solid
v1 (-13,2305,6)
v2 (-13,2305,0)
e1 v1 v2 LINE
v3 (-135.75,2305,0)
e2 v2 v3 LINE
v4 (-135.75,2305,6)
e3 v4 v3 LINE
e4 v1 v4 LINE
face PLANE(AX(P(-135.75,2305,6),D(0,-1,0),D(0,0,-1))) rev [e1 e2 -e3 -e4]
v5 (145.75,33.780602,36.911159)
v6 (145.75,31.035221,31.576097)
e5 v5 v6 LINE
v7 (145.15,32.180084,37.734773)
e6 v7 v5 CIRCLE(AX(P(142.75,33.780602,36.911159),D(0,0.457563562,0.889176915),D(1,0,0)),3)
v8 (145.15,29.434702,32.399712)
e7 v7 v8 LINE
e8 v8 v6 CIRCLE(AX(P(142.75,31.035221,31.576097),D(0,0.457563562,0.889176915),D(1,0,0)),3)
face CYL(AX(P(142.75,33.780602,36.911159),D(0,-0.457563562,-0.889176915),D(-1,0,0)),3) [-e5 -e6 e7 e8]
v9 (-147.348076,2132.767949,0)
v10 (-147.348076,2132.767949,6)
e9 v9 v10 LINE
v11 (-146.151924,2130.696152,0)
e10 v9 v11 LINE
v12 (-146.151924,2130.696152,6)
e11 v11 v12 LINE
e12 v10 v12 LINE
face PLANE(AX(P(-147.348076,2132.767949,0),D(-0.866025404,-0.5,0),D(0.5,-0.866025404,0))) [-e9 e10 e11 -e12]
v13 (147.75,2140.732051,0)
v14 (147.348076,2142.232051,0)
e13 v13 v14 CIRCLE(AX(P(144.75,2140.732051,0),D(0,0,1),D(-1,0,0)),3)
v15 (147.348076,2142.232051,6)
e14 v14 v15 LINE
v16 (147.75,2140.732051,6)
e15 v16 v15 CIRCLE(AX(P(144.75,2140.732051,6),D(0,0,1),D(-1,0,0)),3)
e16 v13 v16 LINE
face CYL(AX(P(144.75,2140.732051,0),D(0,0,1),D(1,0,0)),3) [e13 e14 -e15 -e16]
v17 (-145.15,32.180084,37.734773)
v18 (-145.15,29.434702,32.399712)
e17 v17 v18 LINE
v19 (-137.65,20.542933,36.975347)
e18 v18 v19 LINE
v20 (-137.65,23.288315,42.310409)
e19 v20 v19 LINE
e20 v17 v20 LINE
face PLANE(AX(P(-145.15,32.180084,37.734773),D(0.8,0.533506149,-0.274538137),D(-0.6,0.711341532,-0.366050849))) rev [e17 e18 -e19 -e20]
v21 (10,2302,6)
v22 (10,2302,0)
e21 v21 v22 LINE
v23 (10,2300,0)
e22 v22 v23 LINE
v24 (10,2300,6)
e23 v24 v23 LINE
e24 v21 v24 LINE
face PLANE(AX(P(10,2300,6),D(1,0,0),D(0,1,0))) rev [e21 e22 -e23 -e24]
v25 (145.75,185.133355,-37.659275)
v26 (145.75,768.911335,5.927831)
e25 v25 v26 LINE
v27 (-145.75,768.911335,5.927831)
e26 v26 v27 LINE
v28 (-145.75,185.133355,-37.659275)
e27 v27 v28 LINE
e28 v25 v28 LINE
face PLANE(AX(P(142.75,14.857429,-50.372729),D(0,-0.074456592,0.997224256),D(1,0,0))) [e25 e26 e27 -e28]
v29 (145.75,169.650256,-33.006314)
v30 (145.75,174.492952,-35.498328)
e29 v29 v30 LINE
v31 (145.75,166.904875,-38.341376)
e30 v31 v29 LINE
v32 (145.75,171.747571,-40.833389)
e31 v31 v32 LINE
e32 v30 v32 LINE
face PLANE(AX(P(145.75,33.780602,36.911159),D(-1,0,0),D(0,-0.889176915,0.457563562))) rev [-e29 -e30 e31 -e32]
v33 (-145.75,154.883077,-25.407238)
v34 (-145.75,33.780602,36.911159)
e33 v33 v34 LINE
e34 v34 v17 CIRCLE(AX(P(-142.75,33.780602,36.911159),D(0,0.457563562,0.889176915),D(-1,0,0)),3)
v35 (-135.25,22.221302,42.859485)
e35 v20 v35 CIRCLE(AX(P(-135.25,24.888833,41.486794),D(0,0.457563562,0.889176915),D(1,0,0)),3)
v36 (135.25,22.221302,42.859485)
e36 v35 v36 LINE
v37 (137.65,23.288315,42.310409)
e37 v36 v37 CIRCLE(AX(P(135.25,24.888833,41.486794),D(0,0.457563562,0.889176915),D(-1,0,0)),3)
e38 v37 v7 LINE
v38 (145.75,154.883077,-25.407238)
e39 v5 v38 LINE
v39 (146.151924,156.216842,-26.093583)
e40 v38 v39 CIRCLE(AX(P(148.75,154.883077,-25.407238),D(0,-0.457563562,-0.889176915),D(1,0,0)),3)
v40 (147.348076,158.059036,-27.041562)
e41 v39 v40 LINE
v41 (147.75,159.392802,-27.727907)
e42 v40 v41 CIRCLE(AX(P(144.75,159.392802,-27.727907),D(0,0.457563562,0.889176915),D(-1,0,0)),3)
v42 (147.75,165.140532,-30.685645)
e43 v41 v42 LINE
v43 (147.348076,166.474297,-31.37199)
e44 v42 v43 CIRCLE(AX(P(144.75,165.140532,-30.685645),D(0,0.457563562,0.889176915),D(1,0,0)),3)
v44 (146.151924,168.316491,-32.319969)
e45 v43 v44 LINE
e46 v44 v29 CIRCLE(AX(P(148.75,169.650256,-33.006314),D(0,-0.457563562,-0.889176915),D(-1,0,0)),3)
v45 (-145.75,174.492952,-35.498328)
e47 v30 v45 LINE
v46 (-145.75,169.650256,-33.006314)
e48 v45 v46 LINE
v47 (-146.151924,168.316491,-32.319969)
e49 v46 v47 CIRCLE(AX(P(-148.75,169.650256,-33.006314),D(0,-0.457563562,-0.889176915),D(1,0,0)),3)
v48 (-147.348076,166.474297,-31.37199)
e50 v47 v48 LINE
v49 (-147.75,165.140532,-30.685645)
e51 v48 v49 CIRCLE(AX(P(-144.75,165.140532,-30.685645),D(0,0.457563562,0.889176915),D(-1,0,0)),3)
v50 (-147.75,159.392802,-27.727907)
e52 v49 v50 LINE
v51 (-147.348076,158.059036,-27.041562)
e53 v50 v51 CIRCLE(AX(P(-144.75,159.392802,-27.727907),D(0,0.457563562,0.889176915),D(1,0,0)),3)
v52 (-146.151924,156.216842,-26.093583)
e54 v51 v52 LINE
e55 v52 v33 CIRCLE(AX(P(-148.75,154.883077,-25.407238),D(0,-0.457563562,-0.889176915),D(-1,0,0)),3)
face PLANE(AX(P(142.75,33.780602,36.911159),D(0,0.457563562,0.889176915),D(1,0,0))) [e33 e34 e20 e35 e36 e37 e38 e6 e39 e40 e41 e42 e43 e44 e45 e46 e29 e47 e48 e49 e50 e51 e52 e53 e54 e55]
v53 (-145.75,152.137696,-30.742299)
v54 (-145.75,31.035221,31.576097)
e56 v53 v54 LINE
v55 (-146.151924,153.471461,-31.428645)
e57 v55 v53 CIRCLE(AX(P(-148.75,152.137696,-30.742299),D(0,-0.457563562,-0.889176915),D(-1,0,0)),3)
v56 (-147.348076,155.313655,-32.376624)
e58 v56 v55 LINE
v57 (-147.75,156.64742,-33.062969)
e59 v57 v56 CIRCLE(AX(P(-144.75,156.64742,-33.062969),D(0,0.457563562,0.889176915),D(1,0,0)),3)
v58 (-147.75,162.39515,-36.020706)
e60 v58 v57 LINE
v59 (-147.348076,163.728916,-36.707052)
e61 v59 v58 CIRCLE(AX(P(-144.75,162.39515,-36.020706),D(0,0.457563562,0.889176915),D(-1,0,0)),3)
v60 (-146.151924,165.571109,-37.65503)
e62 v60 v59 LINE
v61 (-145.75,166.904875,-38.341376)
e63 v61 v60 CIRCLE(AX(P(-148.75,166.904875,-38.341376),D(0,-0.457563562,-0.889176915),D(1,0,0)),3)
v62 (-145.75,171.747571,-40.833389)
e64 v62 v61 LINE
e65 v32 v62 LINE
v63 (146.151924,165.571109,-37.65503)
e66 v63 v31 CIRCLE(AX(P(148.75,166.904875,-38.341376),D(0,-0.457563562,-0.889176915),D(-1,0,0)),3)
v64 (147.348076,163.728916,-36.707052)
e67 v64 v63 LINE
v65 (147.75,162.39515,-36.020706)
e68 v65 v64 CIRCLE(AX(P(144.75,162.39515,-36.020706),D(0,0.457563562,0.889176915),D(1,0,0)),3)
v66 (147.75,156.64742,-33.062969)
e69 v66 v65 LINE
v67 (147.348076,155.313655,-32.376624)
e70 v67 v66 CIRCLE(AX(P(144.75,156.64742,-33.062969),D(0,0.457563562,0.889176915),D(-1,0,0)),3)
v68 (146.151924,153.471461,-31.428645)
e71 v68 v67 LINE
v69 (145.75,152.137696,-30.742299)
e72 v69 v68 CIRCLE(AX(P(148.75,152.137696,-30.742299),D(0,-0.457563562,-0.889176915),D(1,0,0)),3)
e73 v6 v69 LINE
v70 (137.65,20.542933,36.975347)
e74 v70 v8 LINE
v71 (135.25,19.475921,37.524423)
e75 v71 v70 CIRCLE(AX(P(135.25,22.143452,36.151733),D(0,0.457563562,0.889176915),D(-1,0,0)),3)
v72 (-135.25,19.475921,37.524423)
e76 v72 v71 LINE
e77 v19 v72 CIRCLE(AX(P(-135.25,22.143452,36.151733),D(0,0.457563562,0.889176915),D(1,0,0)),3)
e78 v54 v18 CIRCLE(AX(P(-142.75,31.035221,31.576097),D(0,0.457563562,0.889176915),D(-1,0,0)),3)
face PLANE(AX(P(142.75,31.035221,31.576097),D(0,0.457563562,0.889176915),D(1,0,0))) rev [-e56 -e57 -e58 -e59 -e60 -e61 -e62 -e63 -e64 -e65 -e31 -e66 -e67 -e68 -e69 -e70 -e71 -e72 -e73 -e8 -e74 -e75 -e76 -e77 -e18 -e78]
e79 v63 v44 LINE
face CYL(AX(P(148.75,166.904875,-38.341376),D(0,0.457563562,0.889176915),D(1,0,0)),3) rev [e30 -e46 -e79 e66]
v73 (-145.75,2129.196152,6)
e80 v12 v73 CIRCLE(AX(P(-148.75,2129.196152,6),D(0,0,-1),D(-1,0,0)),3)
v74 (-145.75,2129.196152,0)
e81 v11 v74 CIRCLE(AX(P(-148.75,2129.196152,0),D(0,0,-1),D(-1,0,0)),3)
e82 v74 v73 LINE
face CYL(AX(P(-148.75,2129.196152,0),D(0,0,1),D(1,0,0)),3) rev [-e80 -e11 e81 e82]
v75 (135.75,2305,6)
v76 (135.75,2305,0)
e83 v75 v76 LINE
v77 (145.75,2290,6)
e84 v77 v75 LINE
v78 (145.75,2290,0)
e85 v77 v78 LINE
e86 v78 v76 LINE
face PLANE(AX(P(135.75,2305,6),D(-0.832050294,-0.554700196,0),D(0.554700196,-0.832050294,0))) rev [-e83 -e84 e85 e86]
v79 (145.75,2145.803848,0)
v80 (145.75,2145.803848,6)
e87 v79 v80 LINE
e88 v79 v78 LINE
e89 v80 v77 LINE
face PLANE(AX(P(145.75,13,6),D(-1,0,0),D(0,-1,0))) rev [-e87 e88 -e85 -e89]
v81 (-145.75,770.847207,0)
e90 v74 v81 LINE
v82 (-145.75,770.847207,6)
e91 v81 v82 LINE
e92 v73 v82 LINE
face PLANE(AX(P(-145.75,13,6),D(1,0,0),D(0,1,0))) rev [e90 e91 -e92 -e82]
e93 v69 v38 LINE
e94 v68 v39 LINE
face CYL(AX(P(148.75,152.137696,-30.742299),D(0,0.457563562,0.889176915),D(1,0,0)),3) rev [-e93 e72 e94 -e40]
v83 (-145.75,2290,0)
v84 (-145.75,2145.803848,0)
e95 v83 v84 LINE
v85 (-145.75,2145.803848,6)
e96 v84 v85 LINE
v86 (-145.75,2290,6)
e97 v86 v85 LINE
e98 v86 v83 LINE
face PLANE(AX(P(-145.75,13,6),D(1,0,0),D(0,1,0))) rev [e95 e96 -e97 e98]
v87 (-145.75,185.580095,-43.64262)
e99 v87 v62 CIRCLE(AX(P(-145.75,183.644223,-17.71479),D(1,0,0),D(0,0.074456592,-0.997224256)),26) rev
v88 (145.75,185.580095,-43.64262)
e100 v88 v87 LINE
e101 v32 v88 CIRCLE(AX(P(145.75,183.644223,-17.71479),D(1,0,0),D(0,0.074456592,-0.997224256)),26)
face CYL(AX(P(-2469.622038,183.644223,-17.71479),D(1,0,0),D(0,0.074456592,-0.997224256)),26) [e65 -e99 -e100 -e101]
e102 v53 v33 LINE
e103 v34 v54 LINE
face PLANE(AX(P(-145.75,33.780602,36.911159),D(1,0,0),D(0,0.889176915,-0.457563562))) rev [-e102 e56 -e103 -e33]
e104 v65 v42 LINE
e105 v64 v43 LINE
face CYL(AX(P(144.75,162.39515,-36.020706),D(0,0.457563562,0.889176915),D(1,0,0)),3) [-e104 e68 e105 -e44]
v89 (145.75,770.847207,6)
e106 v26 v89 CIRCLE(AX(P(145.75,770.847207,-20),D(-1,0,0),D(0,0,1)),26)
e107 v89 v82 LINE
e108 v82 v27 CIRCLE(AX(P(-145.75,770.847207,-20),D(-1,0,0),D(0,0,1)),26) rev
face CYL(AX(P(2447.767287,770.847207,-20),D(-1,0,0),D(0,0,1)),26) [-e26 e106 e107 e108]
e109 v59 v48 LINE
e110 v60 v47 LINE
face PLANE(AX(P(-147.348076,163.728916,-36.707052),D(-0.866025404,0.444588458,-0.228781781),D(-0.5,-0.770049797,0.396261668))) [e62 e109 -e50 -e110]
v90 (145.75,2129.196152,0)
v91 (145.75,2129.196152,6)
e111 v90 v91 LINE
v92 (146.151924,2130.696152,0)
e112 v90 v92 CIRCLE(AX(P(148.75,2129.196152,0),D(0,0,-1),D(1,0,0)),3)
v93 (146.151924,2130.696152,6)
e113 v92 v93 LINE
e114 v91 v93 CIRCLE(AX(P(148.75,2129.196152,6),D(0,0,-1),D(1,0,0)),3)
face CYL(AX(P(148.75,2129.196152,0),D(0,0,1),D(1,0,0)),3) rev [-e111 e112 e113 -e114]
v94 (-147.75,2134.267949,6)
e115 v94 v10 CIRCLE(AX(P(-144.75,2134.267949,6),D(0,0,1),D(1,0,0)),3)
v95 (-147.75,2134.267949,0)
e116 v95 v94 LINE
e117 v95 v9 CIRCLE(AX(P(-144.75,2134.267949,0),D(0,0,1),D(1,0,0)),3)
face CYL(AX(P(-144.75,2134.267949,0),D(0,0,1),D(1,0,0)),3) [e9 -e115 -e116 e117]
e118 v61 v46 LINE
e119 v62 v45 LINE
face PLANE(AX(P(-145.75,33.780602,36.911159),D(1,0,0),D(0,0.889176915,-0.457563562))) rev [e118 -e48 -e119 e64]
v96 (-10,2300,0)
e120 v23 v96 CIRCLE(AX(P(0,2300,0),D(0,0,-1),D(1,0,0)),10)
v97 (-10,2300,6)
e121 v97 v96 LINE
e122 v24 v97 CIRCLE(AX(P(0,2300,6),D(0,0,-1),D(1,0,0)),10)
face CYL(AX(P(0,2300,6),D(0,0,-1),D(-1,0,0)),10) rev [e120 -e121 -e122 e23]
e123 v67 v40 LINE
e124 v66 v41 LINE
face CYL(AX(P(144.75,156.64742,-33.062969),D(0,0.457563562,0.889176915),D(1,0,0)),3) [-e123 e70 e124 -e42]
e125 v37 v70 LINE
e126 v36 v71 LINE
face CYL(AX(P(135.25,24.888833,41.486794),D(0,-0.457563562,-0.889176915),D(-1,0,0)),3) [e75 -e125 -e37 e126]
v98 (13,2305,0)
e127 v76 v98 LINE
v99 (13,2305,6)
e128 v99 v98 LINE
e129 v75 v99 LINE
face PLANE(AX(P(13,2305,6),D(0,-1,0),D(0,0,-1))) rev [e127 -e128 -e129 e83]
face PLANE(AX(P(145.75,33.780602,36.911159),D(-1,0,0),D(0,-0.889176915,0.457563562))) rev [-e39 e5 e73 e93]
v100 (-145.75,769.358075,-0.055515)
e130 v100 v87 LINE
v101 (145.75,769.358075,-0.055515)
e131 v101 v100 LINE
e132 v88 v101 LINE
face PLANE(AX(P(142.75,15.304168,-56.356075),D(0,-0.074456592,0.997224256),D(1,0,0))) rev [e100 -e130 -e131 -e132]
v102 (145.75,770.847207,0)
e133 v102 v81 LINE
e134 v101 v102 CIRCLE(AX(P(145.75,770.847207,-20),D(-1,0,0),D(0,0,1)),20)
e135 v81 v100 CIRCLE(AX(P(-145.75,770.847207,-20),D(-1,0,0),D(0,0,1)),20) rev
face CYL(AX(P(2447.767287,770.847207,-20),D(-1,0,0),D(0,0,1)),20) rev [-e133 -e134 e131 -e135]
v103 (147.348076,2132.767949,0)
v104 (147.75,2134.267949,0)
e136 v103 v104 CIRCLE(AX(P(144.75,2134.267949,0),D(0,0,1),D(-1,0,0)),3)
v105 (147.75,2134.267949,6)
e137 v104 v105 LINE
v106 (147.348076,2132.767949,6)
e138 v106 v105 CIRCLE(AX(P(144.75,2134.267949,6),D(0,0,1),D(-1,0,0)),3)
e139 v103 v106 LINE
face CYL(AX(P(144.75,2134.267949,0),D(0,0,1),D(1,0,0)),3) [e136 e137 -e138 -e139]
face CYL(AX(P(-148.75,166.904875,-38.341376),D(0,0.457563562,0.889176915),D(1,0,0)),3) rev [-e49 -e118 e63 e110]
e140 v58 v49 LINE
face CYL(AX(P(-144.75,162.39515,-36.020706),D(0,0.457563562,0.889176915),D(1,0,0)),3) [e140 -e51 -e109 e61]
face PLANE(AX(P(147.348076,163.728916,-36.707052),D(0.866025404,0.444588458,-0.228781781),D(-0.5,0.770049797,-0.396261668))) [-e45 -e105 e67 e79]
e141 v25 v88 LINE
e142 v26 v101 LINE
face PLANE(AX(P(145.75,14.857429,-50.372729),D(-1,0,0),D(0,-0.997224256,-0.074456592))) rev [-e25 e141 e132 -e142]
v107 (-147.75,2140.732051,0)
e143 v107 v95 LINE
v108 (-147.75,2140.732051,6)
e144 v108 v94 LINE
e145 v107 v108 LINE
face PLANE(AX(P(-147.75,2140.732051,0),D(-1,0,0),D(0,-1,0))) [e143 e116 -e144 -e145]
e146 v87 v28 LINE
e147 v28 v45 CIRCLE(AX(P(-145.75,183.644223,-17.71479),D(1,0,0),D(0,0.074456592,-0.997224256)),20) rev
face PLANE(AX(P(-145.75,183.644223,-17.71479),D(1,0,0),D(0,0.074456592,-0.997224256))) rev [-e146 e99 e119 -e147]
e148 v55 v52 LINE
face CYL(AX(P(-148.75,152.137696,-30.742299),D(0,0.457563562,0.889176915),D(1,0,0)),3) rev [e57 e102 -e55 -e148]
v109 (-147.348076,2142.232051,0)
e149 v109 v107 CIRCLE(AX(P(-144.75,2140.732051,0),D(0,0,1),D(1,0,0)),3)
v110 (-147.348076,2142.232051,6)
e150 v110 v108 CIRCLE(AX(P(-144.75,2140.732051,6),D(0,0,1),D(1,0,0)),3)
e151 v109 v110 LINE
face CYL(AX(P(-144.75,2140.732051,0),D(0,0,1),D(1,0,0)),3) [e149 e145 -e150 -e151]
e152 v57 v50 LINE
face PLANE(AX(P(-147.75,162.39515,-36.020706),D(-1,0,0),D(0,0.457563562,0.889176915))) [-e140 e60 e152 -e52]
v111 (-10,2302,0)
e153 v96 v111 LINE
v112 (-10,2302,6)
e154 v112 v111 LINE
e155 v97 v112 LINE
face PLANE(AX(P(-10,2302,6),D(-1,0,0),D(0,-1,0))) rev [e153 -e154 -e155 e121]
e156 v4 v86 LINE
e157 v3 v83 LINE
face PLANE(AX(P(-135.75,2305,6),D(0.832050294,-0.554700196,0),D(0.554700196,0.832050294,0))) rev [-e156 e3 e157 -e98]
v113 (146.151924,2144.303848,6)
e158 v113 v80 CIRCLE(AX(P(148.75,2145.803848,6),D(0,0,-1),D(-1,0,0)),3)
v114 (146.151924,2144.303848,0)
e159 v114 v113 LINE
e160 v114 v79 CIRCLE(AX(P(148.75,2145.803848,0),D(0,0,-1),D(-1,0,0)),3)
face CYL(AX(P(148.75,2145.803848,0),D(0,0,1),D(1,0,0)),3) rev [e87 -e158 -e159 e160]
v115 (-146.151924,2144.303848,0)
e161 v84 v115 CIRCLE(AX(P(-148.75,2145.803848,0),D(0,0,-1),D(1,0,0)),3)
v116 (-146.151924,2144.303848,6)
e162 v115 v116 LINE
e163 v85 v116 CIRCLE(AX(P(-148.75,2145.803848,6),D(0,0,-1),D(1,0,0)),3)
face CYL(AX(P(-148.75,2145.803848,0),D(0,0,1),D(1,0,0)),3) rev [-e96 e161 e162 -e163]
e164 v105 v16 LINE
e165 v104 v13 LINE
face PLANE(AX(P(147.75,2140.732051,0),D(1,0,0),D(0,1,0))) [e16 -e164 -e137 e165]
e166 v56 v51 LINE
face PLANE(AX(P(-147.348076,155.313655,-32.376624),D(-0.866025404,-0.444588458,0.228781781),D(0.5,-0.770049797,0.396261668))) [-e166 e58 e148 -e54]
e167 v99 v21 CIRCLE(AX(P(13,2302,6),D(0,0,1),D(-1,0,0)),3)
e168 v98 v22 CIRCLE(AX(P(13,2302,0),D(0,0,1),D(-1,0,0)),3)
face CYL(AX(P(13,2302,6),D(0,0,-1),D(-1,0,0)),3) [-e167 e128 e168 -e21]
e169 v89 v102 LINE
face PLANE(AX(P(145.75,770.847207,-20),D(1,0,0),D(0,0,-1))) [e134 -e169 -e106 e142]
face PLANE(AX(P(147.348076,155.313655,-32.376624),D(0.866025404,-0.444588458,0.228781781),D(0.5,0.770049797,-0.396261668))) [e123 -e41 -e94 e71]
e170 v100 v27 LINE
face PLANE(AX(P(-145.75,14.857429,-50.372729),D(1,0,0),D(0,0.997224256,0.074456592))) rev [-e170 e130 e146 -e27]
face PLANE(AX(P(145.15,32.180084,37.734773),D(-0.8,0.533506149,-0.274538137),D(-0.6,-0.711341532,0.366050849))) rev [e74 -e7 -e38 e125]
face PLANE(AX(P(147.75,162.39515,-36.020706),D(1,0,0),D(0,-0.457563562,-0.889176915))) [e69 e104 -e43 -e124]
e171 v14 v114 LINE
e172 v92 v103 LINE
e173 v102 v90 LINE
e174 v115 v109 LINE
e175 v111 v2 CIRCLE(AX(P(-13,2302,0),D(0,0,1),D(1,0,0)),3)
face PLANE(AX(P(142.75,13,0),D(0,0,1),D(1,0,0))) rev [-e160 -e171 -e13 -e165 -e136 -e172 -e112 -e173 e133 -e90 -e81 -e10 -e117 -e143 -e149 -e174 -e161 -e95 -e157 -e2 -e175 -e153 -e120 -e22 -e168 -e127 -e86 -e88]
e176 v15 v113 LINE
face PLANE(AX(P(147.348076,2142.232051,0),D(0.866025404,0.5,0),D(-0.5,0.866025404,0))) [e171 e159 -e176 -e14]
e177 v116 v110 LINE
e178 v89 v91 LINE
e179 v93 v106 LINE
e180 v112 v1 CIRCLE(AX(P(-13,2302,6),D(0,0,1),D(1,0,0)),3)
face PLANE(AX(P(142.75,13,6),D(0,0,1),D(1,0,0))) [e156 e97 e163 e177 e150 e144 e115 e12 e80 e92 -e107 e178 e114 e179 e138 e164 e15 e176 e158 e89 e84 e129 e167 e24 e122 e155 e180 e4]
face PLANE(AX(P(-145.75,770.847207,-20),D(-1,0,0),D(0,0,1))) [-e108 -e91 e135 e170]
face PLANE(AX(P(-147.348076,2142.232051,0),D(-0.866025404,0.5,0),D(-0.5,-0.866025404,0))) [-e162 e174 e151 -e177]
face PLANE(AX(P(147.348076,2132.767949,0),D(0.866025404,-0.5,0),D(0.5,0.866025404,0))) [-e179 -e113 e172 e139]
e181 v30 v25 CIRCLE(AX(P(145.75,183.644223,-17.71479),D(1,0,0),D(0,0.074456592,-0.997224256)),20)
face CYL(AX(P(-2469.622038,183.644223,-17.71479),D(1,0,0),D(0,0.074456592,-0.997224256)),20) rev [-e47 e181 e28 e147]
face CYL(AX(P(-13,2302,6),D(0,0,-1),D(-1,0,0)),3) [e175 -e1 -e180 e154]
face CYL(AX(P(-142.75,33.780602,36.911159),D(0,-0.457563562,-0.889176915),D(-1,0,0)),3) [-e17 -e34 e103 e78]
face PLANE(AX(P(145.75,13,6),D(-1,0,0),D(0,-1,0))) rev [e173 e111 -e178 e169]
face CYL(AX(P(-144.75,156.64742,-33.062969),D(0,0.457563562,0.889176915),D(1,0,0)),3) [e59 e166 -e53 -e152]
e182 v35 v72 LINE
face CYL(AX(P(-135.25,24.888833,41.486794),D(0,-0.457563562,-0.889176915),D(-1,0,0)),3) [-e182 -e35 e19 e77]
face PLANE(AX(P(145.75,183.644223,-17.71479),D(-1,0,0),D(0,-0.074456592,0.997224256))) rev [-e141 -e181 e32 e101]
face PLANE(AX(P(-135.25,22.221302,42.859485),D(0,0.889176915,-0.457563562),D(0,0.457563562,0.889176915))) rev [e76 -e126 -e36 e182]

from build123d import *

# Parameters (mm, degrees)
EXTRUDE1_DEPTH         = 6
EXTRUDE2_DEPTH         = 6
PROCESS_BENDS1_START   = 42.277322868
PROCESS_BENDS1_DEPTH   = 6
PROCESS_BENDS1_START_2 = -147.75
PROCESS_BENDS1_2_DEPTH = 295.5
PROCESS_BENDS1_START_3 = -135.25
PROCESS_BENDS1_3_DEPTH = 270.5
PROCESS_BENDS1_START_4 = -145.75
PROCESS_BENDS1_4_DEPTH = 291.5
PROCESS_BENDS1_5_DEPTH = 6


with BuildPart() as part:
    # Sketch1 → Extrude1 (new body)
    with BuildSketch(Plane.XY):
        with BuildLine():
            Line((-135.25, 0), (135.25, 0))
            ThreePointArc((135.25, 0), (136.591640787, 0.316718427), (137.65, 1.2))
            Line((137.65, 1.2), (145.15, 11.2))
            ThreePointArc((145.15, 11.2), (145.596049894, 12.051316702), (145.75, 13))
            Line((145.75, 13), (145.75, 2290))
            Line((145.75, 2290), (135.75, 2305))
            Line((135.75, 2305), (13, 2305))
            ThreePointArc((13, 2305), (10.878679656, 2304.121320344), (10, 2302))
            Line((10, 2302), (10, 2300))
            ThreePointArc((10, 2300), (0, 2290), (-10, 2300))
            Line((-10, 2300), (-10, 2302))
            ThreePointArc((-10, 2302), (-10.878679656, 2304.121320344), (-13, 2305))
            Line((-13, 2305), (-135.75, 2305))
            Line((-135.75, 2305), (-145.75, 2290))
            Line((-145.75, 2290), (-145.75, 13))
            ThreePointArc((-145.75, 13), (-145.596049894, 12.051316702), (-145.15, 11.2))
            Line((-145.15, 11.2), (-137.65, 1.2))
            ThreePointArc((-137.65, 1.2), (-136.591640787, 0.316718427), (-135.25, 0))
        make_face()
    extrude(amount=EXTRUDE1_DEPTH)

    # Sketch3 → Extrude2 (add)
    with BuildSketch(Plane.XY.offset(6)):
        with BuildLine():
            Line((147.348076211, 2142.232050808), (146.151923789, 2144.303847577))
            ThreePointArc((146.151923789, 2144.303847577), (145.852222521, 2145.027390442), (145.75, 2145.803847577))
            Line((145.75, 2145.803847577), (145.75, 2129.196152423))
            ThreePointArc((145.75, 2129.196152423), (145.852222521, 2129.972609558), (146.151923789, 2130.696152423))
            Line((146.151923789, 2130.696152423), (147.348076211, 2132.767949192))
            ThreePointArc((147.348076211, 2132.767949192), (147.647777479, 2133.491492057), (147.75, 2134.267949192))
            Line((147.75, 2134.267949192), (147.75, 2140.732050808))
            ThreePointArc((147.75, 2140.732050808), (147.647777479, 2141.508507943), (147.348076211, 2142.232050808))
        make_face()
        with BuildLine():
            Line((-145.75, 2129.196152423), (-145.75, 2145.803847577))
            ThreePointArc((-145.75, 2145.803847577), (-145.852222521, 2145.027390442), (-146.151923789, 2144.303847577))
            Line((-146.151923789, 2144.303847577), (-147.348076211, 2142.232050808))
            ThreePointArc((-147.348076211, 2142.232050808), (-147.647777479, 2141.508507943), (-147.75, 2140.732050808))
            Line((-147.75, 2140.732050808), (-147.75, 2134.267949192))
            ThreePointArc((-147.75, 2134.267949192), (-147.647777479, 2133.491492057), (-147.348076211, 2132.767949192))
            Line((-147.348076211, 2132.767949192), (-146.151923789, 2130.696152423))
            ThreePointArc((-146.151923789, 2130.696152423), (-145.852222521, 2129.972609558), (-145.75, 2129.196152423))
        make_face()
        with BuildLine():
            Line((145.75, 149.196152423), (145.75, 165.803847577))
            ThreePointArc((145.75, 165.803847577), (145.852222521, 165.027390442), (146.151923789, 164.303847577))
            Line((146.151923789, 164.303847577), (147.348076211, 162.232050808))
            ThreePointArc((147.348076211, 162.232050808), (147.647777479, 161.508507943), (147.75, 160.732050808))
            Line((147.75, 160.732050808), (147.75, 154.267949192))
            ThreePointArc((147.75, 154.267949192), (147.647777479, 153.491492057), (147.348076211, 152.767949192))
            Line((147.348076211, 152.767949192), (146.151923789, 150.696152423))
            ThreePointArc((146.151923789, 150.696152423), (145.852222521, 149.972609558), (145.75, 149.196152423))
        make_face()
        with BuildLine():
            Line((-147.348076211, 162.232050808), (-146.151923789, 164.303847577))
            ThreePointArc((-146.151923789, 164.303847577), (-145.852222521, 165.027390442), (-145.75, 165.803847577))
            Line((-145.75, 165.803847577), (-145.75, 149.196152423))
            ThreePointArc((-145.75, 149.196152423), (-145.852222521, 149.972609558), (-146.151923789, 150.696152423))
            Line((-146.151923789, 150.696152423), (-147.348076211, 152.767949192))
            ThreePointArc((-147.348076211, 152.767949192), (-147.647777479, 153.491492057), (-147.75, 154.267949192))
            Line((-147.75, 154.267949192), (-147.75, 160.732050808))
            ThreePointArc((-147.75, 160.732050808), (-147.647777479, 161.508507943), (-147.348076211, 162.232050808))
        make_face()
    extrude(amount=-EXTRUDE2_DEPTH)

    # Process-Bends1 2 outline → Process-Bends1 2 (cut)
    with BuildSketch(Plane.YZ.offset(PROCESS_BENDS1_START_2)):
        Polygon((92.396611983, 0), (80.736895303, 6), (0, 6), (0, 0), align=None)
        with BuildLine():
            Line((770.847206555, 6), (93.849827585, 6))
            Line((93.849827585, 6), (105.509544266, 0))
            Line((105.509544266, 0), (689.517739901, 0))
            Line((689.517739901, 0), (768.911335172, 5.927830646))
            ThreePointArc((768.911335172, 5.927830646), (769.878598478, 5.981951397), (770.847206555, 6))
        make_face()
    extrude(amount=PROCESS_BENDS1_2_DEPTH, mode=Mode.SUBTRACT)

    # Process-Bends1 3 outline → Process-Bends1 3 (add)
    with BuildSketch(Plane.YZ.offset(PROCESS_BENDS1_START_3)):
        Polygon((22.221302391, 42.859484921), (19.475921021, 37.524423428), (80.736895303, 6), (93.849827585, 6), align=None)
        with BuildLine():
            Line((105.509544266, 0), (92.396611983, 0))
            Line((92.396611983, 0), (171.747570561, -40.833389396))
            ThreePointArc((171.747570561, -40.833389396), (178.469550701, -43.194639768), (185.580094549, -43.64262024))
            Line((185.580094549, -43.64262024), (769.358074722, -0.055514888))
            ThreePointArc((769.358074722, -0.055514888), (770.102123419, -0.013883541), (770.847206555, 0))
            Line((770.847206555, 0), (689.517739901, 0))
            Line((689.517739901, 0), (185.133354999, -37.659274706))
            ThreePointArc((185.133354999, -37.659274706), (179.663705885, -37.314674343), (174.492951931, -35.498327904))
            Line((174.492951931, -35.498327904), (105.509544266, 0))
        make_face()
    extrude(amount=PROCESS_BENDS1_3_DEPTH)



with BuildPart() as body_2:
    # Process-Bends1: read off the stored shape, not the designer's step
    # Process-Bends1 outline → Process-Bends1 (new body)
    with BuildSketch(Plane(origin=(0, 0, 0), x_dir=(1, 0, 0), z_dir=(0, 0.457563561703474, 0.889176915468025)).offset(PROCESS_BENDS1_START)):
        with BuildLine():
            ThreePointArc((-145.75, 165.951578122), (-145.852222521, 165.175120987), (-146.151923789, 164.451578122))
            Line((-146.151923789, 164.451578122), (-147.348076211, 162.379781352))
            ThreePointArc((-147.348076211, 162.379781352), (-147.647777479, 161.656238487), (-147.75, 160.879781352))
            Line((-147.75, 160.879781352), (-147.75, 154.415679737))
            ThreePointArc((-147.75, 154.415679737), (-147.647777479, 153.639222602), (-147.348076211, 152.915679737))
            Line((-147.348076211, 152.915679737), (-146.151923789, 150.843882967))
            ThreePointArc((-146.151923789, 150.843882967), (-145.852222521, 150.120340102), (-145.75, 149.343882967))
            Line((-145.75, 149.343882967), (-145.75, 165.951578122))
        make_face()
        with BuildLine():
            Line((145.75, 165.951578122), (145.75, 149.343882967))
            ThreePointArc((145.75, 149.343882967), (145.852222521, 150.120340102), (146.151923789, 150.843882967))
            Line((146.151923789, 150.843882967), (147.348076211, 152.915679737))
            ThreePointArc((147.348076211, 152.915679737), (147.647777479, 153.639222602), (147.75, 154.415679737))
            Line((147.75, 154.415679737), (147.75, 160.879781352))
            ThreePointArc((147.75, 160.879781352), (147.647777479, 161.656238487), (147.348076211, 162.379781352))
            Line((147.348076211, 162.379781352), (146.151923789, 164.451578122))
            ThreePointArc((146.151923789, 164.451578122), (145.852222521, 165.175120987), (145.75, 165.951578122))
        make_face()
    extrude(amount=PROCESS_BENDS1_DEPTH)


with BuildPart() as part_1:
    add(part.part)

    add(body_2.part)  # Process-Bends1 4 merges body 2
    # Process-Bends1 4 outline → Process-Bends1 4 (add)
    with BuildSketch(Plane.YZ.offset(PROCESS_BENDS1_START_4)):
        with BuildLine():
            Line((105.509544266, 0), (92.396611983, 0))
            Line((92.396611983, 0), (171.747570561, -40.833389396))
            ThreePointArc((171.747570561, -40.833389396), (178.469550701, -43.194639768), (185.580094549, -43.64262024))
            Line((185.580094549, -43.64262024), (769.358074722, -0.055514888))
            ThreePointArc((769.358074722, -0.055514888), (770.102123419, -0.013883541), (770.847206555, 0))
            Line((770.847206555, 0), (689.517739901, 0))
            Line((689.517739901, 0), (185.133354999, -37.659274706))
            ThreePointArc((185.133354999, -37.659274706), (179.663705885, -37.314674343), (174.492951931, -35.498327904))
            Line((174.492951931, -35.498327904), (105.509544266, 0))
        make_face()
    extrude(amount=PROCESS_BENDS1_4_DEPTH)

    # Process-Bends1 5 outline → Process-Bends1 5 (add)
    with BuildSketch(Plane(origin=(0, 0, 0), x_dir=(1, 0, 0), z_dir=(0, 0.457563561703474, 0.889176915468025)).offset(PROCESS_BENDS1_START)):
        with BuildLine():
            Line((-145.75, 82), (-145.75, 13.147730544))
            ThreePointArc((-145.75, 13.147730544), (-145.596049894, 12.199047246), (-145.15, 11.347730544))
            Line((-145.15, 11.347730544), (-137.65, 1.347730544))
            ThreePointArc((-137.65, 1.347730544), (-136.591640786, 0.464448971), (-135.25, 0.147730544))
            Line((-135.25, 0.147730544), (-135.25, 82))
            Line((-135.25, 82), (-145.75, 82))
        make_face()
        with BuildLine():
            Line((145.75, 82), (135.25, 82))
            Line((135.25, 82), (135.25, 0.147730544))
            ThreePointArc((135.25, 0.147730544), (136.591640786, 0.464448971), (137.65, 1.347730544))
            Line((137.65, 1.347730544), (145.15, 11.347730544))
            ThreePointArc((145.15, 11.347730544), (145.596049894, 12.199047246), (145.75, 13.147730544))
            Line((145.75, 13.147730544), (145.75, 82))
        make_face()
    extrude(amount=PROCESS_BENDS1_5_DEPTH)


solid = part_1.part
